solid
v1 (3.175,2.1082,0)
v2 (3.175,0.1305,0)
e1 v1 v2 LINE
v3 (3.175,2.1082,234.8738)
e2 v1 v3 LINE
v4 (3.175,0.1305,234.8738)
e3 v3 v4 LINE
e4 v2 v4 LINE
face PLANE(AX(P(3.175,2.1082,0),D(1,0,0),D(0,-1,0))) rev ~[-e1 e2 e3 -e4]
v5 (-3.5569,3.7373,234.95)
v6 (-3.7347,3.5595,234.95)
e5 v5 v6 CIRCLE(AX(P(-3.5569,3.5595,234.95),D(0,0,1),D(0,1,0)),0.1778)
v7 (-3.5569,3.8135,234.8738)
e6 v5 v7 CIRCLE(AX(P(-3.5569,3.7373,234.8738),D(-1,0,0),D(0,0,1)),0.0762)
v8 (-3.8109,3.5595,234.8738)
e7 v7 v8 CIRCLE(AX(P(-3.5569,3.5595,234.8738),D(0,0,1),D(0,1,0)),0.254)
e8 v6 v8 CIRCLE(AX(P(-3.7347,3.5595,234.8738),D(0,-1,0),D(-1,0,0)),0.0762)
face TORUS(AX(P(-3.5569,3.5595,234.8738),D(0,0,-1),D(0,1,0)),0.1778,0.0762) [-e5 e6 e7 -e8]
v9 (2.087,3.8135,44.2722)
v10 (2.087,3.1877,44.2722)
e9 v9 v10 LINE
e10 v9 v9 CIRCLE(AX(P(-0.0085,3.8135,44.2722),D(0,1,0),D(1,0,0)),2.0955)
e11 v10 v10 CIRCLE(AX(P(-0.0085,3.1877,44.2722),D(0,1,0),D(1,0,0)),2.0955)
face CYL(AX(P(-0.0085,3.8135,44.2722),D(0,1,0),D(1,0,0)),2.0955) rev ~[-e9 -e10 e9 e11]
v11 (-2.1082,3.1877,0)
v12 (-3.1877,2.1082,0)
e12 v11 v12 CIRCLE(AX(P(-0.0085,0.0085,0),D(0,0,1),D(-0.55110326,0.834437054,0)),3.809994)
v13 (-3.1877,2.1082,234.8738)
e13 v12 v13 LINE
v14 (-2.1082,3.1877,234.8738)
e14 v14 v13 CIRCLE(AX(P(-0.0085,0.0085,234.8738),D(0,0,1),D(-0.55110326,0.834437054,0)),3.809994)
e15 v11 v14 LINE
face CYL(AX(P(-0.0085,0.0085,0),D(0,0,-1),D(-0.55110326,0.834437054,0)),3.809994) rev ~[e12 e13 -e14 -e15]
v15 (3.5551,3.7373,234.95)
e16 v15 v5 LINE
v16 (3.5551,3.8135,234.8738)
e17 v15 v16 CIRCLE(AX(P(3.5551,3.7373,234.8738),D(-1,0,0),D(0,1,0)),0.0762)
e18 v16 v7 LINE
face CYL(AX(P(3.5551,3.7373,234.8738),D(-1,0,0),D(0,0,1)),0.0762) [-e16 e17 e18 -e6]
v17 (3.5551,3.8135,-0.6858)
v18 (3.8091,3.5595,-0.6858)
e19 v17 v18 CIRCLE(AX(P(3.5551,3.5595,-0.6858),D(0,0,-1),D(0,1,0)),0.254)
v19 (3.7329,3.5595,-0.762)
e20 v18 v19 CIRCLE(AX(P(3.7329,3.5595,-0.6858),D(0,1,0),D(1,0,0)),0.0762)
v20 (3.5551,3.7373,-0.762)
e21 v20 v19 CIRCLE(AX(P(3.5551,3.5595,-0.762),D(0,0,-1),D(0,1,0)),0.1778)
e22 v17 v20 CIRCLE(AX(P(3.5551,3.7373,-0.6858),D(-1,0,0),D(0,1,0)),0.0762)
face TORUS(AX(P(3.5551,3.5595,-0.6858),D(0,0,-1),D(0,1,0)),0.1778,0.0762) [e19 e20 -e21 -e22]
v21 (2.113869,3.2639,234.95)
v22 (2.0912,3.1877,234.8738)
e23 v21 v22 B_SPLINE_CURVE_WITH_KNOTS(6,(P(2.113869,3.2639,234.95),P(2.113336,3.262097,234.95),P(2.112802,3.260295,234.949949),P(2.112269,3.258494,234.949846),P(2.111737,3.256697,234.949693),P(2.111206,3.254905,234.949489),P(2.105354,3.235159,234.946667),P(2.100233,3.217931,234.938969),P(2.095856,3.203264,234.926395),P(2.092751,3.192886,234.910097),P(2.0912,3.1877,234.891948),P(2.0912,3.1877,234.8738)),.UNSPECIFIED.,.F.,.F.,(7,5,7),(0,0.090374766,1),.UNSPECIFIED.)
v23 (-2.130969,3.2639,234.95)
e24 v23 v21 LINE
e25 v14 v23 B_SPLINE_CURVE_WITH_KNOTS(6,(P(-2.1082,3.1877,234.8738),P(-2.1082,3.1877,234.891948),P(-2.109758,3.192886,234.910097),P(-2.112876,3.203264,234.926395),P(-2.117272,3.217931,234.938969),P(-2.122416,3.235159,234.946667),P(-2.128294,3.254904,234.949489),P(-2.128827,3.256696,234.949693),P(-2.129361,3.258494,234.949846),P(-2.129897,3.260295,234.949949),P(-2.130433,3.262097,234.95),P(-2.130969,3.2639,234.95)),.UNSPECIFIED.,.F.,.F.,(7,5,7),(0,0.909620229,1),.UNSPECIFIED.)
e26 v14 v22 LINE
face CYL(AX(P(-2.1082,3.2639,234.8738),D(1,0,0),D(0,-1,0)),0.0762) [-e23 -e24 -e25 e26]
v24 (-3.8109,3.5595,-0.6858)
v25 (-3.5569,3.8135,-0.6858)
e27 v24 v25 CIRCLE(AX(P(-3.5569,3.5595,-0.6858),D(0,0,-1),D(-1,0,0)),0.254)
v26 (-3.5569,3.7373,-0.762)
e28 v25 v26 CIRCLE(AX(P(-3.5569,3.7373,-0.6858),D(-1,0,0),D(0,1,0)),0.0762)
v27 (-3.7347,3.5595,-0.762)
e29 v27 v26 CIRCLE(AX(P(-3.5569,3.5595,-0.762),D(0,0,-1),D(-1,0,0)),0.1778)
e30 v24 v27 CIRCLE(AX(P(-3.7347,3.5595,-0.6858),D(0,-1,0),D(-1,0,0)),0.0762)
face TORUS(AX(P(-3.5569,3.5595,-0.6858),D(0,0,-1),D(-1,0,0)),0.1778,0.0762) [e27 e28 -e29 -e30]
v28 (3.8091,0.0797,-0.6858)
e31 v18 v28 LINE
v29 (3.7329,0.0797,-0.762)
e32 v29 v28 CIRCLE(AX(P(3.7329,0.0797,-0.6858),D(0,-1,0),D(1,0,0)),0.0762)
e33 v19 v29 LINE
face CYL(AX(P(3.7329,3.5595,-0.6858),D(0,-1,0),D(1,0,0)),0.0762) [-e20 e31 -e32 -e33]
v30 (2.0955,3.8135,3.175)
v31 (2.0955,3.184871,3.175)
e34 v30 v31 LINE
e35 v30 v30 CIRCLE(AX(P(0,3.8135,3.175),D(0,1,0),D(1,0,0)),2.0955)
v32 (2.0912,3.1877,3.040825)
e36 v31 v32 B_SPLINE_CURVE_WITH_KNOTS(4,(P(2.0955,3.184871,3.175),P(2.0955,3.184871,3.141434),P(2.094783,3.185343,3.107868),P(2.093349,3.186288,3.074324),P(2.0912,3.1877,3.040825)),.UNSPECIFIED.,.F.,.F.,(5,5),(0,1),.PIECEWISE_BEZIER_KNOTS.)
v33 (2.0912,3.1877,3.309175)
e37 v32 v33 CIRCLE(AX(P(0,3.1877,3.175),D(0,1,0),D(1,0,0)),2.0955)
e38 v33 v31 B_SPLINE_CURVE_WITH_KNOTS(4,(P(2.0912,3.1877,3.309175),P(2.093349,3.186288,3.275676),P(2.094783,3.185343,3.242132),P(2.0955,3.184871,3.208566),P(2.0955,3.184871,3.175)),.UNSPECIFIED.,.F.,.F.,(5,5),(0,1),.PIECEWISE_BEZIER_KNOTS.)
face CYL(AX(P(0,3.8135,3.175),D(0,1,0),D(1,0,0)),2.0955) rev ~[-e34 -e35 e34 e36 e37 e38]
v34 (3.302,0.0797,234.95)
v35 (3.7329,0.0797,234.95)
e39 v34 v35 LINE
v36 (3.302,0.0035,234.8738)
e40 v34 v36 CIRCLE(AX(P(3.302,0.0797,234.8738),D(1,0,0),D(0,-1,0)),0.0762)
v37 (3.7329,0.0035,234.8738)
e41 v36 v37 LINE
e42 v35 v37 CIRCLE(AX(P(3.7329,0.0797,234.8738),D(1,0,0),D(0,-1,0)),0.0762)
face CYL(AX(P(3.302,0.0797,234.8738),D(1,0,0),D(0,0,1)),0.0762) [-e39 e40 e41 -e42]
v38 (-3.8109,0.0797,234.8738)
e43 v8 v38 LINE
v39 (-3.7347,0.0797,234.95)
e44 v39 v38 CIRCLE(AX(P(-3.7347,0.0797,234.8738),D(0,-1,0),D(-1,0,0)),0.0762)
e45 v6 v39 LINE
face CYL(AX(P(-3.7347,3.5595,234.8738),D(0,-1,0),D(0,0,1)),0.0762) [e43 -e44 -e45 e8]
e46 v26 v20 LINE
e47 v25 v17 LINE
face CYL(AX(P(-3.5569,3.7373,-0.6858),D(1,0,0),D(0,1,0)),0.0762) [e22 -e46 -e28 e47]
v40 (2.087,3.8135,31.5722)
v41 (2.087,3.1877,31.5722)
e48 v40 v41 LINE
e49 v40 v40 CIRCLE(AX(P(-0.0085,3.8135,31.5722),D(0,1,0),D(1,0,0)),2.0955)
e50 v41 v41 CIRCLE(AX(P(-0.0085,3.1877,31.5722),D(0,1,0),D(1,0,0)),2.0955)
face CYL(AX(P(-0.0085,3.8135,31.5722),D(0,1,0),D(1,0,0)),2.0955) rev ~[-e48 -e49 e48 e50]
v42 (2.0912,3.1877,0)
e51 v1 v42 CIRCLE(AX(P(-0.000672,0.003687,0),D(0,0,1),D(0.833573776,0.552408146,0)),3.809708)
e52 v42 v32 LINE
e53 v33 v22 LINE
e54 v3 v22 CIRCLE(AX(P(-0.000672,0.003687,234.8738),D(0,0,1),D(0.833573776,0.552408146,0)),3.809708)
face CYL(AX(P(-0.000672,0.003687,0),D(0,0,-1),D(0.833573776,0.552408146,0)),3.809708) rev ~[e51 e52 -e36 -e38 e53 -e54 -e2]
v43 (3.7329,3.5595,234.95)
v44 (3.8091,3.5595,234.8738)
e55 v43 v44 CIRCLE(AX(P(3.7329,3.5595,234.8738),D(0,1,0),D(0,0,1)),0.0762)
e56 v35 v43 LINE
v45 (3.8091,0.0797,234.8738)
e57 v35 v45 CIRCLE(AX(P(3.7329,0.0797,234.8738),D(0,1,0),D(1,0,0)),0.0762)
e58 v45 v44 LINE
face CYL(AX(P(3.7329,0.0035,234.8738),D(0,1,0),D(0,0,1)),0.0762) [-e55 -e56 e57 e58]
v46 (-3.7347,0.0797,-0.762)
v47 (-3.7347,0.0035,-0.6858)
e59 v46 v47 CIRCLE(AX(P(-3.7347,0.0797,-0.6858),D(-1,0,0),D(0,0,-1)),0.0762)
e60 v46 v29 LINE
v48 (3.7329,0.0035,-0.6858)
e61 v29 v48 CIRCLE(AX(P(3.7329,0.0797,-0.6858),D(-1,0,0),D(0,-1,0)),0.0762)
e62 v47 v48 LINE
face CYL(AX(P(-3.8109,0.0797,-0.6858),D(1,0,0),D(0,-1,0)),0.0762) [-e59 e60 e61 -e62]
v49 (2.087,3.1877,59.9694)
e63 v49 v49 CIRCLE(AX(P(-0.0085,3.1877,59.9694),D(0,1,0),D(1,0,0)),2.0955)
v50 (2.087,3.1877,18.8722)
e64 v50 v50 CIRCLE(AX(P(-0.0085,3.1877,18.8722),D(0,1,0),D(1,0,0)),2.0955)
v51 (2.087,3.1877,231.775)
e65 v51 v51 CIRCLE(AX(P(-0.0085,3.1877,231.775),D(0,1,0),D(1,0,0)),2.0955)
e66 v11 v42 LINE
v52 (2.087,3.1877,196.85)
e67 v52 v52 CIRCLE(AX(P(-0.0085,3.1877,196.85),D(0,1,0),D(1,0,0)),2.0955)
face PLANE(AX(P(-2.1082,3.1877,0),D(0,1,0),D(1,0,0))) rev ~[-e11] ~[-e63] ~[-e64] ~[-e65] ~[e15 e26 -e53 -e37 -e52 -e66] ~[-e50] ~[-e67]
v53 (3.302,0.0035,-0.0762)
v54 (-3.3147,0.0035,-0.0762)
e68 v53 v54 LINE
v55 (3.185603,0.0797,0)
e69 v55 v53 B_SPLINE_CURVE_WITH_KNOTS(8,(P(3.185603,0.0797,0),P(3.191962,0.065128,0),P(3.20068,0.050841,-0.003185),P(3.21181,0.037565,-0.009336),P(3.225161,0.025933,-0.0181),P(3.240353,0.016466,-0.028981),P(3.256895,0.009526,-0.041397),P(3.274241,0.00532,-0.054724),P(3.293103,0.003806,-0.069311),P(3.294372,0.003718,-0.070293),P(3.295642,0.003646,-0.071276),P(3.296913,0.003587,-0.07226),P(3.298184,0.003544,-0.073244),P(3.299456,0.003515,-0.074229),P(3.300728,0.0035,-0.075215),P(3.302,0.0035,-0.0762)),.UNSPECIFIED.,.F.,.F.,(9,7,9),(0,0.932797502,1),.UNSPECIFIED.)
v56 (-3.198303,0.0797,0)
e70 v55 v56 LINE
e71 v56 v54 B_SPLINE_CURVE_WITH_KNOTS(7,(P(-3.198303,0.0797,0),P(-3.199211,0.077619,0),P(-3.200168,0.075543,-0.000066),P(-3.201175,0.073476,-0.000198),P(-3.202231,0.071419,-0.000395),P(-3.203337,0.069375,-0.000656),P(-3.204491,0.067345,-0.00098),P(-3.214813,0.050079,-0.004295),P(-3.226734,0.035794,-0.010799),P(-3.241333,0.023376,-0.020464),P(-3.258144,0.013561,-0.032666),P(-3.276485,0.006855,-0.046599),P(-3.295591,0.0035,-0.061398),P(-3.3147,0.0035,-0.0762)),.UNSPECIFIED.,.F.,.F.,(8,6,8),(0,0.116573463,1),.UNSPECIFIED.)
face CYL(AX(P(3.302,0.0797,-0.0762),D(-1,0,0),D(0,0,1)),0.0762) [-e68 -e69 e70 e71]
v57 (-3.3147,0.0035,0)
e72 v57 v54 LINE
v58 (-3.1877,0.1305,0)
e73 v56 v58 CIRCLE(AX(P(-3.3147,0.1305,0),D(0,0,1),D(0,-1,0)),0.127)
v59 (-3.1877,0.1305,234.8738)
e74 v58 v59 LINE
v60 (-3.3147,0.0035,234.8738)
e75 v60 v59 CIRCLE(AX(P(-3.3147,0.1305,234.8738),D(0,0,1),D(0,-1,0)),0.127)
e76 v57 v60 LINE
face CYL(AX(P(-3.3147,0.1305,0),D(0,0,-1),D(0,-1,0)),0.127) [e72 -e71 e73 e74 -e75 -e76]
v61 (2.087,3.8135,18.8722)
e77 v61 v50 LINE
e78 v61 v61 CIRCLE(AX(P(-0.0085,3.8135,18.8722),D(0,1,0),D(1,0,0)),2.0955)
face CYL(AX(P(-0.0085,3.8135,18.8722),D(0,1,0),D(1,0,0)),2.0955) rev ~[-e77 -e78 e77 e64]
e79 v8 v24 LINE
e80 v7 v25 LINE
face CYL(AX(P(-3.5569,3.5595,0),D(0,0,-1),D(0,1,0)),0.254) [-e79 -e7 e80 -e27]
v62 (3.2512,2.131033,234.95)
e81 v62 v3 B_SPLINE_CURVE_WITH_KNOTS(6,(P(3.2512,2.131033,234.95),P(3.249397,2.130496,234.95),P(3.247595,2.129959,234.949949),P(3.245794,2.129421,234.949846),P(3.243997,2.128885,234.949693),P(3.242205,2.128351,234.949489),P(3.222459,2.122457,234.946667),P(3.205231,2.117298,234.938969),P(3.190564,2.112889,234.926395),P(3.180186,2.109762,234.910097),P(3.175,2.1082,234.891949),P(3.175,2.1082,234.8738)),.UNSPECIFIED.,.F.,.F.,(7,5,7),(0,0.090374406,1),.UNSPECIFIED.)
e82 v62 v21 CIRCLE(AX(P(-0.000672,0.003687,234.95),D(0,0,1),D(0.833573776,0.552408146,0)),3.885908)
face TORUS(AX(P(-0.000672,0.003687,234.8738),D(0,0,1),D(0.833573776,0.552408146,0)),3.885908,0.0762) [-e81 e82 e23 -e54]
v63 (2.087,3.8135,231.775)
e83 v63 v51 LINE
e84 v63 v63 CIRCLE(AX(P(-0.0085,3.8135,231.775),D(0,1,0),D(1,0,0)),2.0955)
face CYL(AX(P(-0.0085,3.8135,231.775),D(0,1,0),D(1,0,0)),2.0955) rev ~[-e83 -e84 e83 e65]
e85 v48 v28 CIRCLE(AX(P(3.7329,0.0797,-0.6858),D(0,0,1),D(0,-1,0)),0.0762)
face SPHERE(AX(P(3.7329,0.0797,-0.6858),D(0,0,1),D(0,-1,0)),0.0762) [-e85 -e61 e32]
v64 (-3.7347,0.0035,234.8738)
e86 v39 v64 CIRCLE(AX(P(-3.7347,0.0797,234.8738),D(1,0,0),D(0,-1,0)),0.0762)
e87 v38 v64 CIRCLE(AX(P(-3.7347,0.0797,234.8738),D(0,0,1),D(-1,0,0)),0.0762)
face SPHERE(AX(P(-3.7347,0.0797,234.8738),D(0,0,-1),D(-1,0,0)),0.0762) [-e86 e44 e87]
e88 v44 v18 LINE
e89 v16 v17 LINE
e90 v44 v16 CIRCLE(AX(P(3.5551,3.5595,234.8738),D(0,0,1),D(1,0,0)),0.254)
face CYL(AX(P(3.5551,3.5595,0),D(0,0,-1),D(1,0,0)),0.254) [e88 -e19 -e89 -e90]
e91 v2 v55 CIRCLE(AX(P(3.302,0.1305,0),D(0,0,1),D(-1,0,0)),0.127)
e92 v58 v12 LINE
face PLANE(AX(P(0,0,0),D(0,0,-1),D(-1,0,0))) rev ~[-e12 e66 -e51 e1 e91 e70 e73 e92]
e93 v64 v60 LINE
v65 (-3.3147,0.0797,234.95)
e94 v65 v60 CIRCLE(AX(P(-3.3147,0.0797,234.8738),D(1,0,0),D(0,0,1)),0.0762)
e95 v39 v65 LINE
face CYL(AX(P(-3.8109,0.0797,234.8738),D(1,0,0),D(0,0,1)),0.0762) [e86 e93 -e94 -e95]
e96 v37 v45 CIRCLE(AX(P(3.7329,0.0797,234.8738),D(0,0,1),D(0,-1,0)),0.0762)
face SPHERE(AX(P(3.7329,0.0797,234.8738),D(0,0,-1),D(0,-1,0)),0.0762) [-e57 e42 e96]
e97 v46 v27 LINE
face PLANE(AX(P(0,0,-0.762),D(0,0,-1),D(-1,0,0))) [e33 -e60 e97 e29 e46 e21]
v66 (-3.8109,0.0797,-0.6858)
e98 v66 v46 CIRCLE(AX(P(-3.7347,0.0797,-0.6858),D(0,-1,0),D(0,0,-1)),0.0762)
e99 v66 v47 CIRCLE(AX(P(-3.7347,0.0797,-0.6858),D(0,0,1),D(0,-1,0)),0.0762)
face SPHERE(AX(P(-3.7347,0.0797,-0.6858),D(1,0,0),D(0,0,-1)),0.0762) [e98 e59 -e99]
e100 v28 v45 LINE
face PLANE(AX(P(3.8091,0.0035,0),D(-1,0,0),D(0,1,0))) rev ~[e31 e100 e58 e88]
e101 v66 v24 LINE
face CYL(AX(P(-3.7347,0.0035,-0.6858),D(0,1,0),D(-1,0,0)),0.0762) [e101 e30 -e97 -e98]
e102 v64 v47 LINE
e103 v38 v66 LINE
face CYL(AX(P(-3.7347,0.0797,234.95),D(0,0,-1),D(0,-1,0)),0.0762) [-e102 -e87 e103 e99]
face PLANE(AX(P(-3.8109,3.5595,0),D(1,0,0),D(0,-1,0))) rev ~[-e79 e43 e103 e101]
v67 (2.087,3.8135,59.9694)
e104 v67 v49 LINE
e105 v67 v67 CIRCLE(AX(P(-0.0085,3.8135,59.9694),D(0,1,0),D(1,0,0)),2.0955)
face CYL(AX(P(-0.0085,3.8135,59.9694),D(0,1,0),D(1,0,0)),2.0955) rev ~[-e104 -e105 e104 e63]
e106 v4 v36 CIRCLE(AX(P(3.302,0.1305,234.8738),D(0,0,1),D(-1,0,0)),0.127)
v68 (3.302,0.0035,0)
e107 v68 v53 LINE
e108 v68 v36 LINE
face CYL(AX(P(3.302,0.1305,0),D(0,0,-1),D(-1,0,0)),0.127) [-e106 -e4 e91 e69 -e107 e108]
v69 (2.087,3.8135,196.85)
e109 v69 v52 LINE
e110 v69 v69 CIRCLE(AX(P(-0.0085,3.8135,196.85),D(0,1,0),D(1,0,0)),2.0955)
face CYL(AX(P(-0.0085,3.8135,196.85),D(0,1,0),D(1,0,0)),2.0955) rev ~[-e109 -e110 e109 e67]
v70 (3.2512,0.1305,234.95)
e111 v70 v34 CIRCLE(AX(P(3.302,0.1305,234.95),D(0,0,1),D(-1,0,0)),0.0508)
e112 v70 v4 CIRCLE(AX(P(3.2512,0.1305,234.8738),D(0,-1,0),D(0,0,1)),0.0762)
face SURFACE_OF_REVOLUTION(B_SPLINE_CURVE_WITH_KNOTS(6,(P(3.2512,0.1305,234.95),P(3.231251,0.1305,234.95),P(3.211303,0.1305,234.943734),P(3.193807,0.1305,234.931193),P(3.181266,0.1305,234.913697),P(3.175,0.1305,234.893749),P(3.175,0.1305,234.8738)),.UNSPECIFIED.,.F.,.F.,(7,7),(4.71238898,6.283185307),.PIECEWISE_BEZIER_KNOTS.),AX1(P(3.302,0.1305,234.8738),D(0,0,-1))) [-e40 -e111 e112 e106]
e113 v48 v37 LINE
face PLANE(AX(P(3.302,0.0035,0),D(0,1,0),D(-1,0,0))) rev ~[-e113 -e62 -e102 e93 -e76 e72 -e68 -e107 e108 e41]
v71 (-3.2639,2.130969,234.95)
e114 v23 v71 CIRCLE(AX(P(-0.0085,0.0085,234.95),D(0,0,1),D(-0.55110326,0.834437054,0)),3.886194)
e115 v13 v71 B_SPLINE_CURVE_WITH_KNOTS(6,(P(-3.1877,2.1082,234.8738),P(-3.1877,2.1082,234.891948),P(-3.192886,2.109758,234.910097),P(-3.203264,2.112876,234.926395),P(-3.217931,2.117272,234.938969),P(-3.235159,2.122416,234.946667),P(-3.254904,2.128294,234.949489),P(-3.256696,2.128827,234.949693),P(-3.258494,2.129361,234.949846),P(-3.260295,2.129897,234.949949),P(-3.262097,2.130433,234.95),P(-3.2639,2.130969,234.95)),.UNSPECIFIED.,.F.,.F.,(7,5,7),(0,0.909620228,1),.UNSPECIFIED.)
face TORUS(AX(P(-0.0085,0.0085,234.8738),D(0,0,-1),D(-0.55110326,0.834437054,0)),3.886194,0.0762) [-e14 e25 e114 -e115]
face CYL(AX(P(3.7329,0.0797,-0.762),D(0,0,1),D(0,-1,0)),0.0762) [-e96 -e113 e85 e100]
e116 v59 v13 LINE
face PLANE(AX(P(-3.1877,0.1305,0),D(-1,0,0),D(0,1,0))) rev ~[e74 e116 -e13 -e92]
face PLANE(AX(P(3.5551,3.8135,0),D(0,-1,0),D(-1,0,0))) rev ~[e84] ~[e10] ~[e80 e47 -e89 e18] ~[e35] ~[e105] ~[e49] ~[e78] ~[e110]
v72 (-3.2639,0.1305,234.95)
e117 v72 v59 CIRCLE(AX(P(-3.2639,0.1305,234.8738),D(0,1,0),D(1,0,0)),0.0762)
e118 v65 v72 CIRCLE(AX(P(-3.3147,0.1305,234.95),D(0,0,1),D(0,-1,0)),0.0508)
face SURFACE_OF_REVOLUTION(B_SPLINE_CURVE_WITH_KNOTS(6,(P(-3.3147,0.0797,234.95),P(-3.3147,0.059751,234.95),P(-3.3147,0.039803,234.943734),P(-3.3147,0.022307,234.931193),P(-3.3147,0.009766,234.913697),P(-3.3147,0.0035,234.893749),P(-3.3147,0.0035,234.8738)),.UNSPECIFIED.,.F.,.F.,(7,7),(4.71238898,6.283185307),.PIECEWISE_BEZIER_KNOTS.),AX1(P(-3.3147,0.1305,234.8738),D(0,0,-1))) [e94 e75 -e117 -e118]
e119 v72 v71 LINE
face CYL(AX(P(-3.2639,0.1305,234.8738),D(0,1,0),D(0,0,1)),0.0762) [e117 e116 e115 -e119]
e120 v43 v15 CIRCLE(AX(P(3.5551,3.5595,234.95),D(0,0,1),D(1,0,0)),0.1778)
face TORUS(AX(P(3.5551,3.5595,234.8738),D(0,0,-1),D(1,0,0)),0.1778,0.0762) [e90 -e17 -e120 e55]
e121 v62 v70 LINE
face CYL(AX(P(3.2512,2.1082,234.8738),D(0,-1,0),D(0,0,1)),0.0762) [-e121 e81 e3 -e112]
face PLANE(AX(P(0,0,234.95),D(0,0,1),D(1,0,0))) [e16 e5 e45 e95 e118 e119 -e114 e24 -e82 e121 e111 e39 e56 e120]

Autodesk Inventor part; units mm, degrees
ref_plane "YZ Plane" through (0, 0, 0) normal (1, 0, 0) x (0, 1, 0)
ref_plane "XZ Plane" through (0, 0, 0) normal (0, 1, 0) x (-1, 0, 0)
ref_plane "XY Plane" through (0, 0, 0) normal (0, 0, 1) x (1, 0, 0)
sketch "Sketch1" plane through (0, 0, 0) normal (0, 0, 1) x (1, 0, 0)
  line L0 (-2.1082, 3.1877) -> (2.0912, 3.1877)
  line L1 (3.175, 2.1082) -> (3.175, 0.1305)
  line L2 (-3.1877, 0.1305) -> (-3.1877, 2.1082)
  arc A0 (-2.1082, 3.1877) -> (-3.1877, 2.1082) centre (-0.0085, 0.0085) ccw
  line L3 (-2.1082, 3.1877) -> (-3.1877, 2.1082) construction
  line L4 (-2.1082, 3.1877) -> (-0.5816, 3.1877) construction
  arc A1 (3.175, 2.1082) -> (2.0912, 3.1877) centre (-0.0009, 0.0035) ccw
  line L5 (3.8091, 0.0035) -> (3.8091, 3.5595)
  line L6 (3.5551, 3.8135) -> (-3.5569, 3.8135)
  line L7 (-3.8109, 3.5595) -> (-3.8109, 0.0035)
  arc A2 (-3.5569, 3.8135) -> (-3.8109, 3.5595) centre (-3.5569, 3.5595) ccw
  arc A3 (3.8091, 3.5595) -> (3.5551, 3.8135) centre (3.5551, 3.5595) ccw
  line L8 (-3.8109, 0.0035) -> (-3.3147, 0.0035)
  line L9 (3.302, 0.0035) -> (3.8091, 0.0035)
  arc A4 (-3.3147, 0.0035) -> (-3.1877, 0.1305) centre (-3.3147, 0.1305) ccw
  arc A5 (3.175, 0.1305) -> (3.302, 0.0035) centre (3.302, 0.1305) ccw
  point P0 (0, 0)
  point P1 (3.8091, 3.8135)
  point P2 (-3.8109, 3.8135)
  dimension "d0" = 135
  dimension "d1" = 3.81
  dimension "d2" = 3.81
  dimension "d3" = 7.62
  dimension "d4" = 3.81
  dimension "d5" = 0.254
  dimension "d6" = 0.127
extrude "Extrusion1" add sketch "Sketch1" along normal blind 234.95
sketch "Sketch2" plane through (0, 0, 0) normal (0, 0, -1) x (-1, 0, 0)
  line L0 (-3.302, 0.0035) -> (-3.8091, 0.0035) projected
  line L1 (3.5569, 3.8135) -> (-3.5551, 3.8135)
  line L2 (-3.8091, 3.5595) -> (-3.8091, 0.0035)
  line L3 (-3.8091, 0.0035) -> (3.8109, 0.0035)
  line L4 (3.8109, 0.0035) -> (3.8109, 3.5595)
  arc A0 (3.8109, 3.5595) -> (3.5569, 3.8135) centre (3.5569, 3.5595) ccw
  arc A1 (-3.5551, 3.8135) -> (-3.8091, 3.5595) centre (-3.5551, 3.5595) ccw
  point P0 (0, 0)
  dimension "d9" = 0.254
extrude "Extrusion2" add sketch "Sketch2" along normal blind 0.762
sketch "Sketch4" plane through (-0.0085, 3.8135, 0) normal (0, 1, 0) x (1, 0, 0)
  circle A0 centre (0.0085, -3.175) radius 2.0955
  circle A1 centre (0, -231.775) radius 2.0955
  circle A2 centre (0, -196.85) radius 2.0955
  circle A3 centre (0, -59.9694) radius 2.0955
  circle A4 centre (0, -31.5722) radius 2.0955
  circle A5 centre (0, -44.2722) radius 2.0955
  circle A6 centre (0, -18.8722) radius 2.0955
  point P0 (0.0085, 0)
  dimension "d15" = 4.191
  dimension "d16" = 4.191
  dimension "d17" = 4.191
  dimension "d18" = 4.191
  dimension "d19" = 4.191
  dimension "d20" = 4.191
  dimension "d21" = 4.191
extrude "Extrusion3" cut sketch "Sketch4" against normal blind 4.191
fillet "Fillet1" radius 0.0762 23 edges at (3.8091, 0.0035, 117.094) (-0.0009, 0.0035, -0.762) (3.7347, 3.7391, -0.762) (-0.0009, 3.8135, -0.762) (-3.7365, 3.7391, -0.762) (-3.8109, 1.7815, -0.762) (3.8091, 1.7815, -0.762) (-3.8109, 0.0035, 117.094) (-0.0063, 0.0035, 0) (3.2122, 0.0407, 234.95) (3.175, 1.1193, 234.95) (3.5556, 0.0035, 234.95) (3.7347, 3.7391, 234.95) (-0.0009, 3.8135, 234.95) (-3.7365, 3.7391, 234.95) (-3.8109, 1.7815, 234.95) (3.8091, 1.7815, 234.95) (2.6878, 2.7029, 234.95) (-0.0085, 3.1877, 234.95) (-2.7026, 2.7026, 234.95) (-3.2249, 0.0407, 234.95) (-3.5628, 0.0035, 234.95) (-3.1877, 1.1193, 234.95)
equation "\"d22\" = d20"
properties part number "hs_brace_jig" material "ABS Plastic"
